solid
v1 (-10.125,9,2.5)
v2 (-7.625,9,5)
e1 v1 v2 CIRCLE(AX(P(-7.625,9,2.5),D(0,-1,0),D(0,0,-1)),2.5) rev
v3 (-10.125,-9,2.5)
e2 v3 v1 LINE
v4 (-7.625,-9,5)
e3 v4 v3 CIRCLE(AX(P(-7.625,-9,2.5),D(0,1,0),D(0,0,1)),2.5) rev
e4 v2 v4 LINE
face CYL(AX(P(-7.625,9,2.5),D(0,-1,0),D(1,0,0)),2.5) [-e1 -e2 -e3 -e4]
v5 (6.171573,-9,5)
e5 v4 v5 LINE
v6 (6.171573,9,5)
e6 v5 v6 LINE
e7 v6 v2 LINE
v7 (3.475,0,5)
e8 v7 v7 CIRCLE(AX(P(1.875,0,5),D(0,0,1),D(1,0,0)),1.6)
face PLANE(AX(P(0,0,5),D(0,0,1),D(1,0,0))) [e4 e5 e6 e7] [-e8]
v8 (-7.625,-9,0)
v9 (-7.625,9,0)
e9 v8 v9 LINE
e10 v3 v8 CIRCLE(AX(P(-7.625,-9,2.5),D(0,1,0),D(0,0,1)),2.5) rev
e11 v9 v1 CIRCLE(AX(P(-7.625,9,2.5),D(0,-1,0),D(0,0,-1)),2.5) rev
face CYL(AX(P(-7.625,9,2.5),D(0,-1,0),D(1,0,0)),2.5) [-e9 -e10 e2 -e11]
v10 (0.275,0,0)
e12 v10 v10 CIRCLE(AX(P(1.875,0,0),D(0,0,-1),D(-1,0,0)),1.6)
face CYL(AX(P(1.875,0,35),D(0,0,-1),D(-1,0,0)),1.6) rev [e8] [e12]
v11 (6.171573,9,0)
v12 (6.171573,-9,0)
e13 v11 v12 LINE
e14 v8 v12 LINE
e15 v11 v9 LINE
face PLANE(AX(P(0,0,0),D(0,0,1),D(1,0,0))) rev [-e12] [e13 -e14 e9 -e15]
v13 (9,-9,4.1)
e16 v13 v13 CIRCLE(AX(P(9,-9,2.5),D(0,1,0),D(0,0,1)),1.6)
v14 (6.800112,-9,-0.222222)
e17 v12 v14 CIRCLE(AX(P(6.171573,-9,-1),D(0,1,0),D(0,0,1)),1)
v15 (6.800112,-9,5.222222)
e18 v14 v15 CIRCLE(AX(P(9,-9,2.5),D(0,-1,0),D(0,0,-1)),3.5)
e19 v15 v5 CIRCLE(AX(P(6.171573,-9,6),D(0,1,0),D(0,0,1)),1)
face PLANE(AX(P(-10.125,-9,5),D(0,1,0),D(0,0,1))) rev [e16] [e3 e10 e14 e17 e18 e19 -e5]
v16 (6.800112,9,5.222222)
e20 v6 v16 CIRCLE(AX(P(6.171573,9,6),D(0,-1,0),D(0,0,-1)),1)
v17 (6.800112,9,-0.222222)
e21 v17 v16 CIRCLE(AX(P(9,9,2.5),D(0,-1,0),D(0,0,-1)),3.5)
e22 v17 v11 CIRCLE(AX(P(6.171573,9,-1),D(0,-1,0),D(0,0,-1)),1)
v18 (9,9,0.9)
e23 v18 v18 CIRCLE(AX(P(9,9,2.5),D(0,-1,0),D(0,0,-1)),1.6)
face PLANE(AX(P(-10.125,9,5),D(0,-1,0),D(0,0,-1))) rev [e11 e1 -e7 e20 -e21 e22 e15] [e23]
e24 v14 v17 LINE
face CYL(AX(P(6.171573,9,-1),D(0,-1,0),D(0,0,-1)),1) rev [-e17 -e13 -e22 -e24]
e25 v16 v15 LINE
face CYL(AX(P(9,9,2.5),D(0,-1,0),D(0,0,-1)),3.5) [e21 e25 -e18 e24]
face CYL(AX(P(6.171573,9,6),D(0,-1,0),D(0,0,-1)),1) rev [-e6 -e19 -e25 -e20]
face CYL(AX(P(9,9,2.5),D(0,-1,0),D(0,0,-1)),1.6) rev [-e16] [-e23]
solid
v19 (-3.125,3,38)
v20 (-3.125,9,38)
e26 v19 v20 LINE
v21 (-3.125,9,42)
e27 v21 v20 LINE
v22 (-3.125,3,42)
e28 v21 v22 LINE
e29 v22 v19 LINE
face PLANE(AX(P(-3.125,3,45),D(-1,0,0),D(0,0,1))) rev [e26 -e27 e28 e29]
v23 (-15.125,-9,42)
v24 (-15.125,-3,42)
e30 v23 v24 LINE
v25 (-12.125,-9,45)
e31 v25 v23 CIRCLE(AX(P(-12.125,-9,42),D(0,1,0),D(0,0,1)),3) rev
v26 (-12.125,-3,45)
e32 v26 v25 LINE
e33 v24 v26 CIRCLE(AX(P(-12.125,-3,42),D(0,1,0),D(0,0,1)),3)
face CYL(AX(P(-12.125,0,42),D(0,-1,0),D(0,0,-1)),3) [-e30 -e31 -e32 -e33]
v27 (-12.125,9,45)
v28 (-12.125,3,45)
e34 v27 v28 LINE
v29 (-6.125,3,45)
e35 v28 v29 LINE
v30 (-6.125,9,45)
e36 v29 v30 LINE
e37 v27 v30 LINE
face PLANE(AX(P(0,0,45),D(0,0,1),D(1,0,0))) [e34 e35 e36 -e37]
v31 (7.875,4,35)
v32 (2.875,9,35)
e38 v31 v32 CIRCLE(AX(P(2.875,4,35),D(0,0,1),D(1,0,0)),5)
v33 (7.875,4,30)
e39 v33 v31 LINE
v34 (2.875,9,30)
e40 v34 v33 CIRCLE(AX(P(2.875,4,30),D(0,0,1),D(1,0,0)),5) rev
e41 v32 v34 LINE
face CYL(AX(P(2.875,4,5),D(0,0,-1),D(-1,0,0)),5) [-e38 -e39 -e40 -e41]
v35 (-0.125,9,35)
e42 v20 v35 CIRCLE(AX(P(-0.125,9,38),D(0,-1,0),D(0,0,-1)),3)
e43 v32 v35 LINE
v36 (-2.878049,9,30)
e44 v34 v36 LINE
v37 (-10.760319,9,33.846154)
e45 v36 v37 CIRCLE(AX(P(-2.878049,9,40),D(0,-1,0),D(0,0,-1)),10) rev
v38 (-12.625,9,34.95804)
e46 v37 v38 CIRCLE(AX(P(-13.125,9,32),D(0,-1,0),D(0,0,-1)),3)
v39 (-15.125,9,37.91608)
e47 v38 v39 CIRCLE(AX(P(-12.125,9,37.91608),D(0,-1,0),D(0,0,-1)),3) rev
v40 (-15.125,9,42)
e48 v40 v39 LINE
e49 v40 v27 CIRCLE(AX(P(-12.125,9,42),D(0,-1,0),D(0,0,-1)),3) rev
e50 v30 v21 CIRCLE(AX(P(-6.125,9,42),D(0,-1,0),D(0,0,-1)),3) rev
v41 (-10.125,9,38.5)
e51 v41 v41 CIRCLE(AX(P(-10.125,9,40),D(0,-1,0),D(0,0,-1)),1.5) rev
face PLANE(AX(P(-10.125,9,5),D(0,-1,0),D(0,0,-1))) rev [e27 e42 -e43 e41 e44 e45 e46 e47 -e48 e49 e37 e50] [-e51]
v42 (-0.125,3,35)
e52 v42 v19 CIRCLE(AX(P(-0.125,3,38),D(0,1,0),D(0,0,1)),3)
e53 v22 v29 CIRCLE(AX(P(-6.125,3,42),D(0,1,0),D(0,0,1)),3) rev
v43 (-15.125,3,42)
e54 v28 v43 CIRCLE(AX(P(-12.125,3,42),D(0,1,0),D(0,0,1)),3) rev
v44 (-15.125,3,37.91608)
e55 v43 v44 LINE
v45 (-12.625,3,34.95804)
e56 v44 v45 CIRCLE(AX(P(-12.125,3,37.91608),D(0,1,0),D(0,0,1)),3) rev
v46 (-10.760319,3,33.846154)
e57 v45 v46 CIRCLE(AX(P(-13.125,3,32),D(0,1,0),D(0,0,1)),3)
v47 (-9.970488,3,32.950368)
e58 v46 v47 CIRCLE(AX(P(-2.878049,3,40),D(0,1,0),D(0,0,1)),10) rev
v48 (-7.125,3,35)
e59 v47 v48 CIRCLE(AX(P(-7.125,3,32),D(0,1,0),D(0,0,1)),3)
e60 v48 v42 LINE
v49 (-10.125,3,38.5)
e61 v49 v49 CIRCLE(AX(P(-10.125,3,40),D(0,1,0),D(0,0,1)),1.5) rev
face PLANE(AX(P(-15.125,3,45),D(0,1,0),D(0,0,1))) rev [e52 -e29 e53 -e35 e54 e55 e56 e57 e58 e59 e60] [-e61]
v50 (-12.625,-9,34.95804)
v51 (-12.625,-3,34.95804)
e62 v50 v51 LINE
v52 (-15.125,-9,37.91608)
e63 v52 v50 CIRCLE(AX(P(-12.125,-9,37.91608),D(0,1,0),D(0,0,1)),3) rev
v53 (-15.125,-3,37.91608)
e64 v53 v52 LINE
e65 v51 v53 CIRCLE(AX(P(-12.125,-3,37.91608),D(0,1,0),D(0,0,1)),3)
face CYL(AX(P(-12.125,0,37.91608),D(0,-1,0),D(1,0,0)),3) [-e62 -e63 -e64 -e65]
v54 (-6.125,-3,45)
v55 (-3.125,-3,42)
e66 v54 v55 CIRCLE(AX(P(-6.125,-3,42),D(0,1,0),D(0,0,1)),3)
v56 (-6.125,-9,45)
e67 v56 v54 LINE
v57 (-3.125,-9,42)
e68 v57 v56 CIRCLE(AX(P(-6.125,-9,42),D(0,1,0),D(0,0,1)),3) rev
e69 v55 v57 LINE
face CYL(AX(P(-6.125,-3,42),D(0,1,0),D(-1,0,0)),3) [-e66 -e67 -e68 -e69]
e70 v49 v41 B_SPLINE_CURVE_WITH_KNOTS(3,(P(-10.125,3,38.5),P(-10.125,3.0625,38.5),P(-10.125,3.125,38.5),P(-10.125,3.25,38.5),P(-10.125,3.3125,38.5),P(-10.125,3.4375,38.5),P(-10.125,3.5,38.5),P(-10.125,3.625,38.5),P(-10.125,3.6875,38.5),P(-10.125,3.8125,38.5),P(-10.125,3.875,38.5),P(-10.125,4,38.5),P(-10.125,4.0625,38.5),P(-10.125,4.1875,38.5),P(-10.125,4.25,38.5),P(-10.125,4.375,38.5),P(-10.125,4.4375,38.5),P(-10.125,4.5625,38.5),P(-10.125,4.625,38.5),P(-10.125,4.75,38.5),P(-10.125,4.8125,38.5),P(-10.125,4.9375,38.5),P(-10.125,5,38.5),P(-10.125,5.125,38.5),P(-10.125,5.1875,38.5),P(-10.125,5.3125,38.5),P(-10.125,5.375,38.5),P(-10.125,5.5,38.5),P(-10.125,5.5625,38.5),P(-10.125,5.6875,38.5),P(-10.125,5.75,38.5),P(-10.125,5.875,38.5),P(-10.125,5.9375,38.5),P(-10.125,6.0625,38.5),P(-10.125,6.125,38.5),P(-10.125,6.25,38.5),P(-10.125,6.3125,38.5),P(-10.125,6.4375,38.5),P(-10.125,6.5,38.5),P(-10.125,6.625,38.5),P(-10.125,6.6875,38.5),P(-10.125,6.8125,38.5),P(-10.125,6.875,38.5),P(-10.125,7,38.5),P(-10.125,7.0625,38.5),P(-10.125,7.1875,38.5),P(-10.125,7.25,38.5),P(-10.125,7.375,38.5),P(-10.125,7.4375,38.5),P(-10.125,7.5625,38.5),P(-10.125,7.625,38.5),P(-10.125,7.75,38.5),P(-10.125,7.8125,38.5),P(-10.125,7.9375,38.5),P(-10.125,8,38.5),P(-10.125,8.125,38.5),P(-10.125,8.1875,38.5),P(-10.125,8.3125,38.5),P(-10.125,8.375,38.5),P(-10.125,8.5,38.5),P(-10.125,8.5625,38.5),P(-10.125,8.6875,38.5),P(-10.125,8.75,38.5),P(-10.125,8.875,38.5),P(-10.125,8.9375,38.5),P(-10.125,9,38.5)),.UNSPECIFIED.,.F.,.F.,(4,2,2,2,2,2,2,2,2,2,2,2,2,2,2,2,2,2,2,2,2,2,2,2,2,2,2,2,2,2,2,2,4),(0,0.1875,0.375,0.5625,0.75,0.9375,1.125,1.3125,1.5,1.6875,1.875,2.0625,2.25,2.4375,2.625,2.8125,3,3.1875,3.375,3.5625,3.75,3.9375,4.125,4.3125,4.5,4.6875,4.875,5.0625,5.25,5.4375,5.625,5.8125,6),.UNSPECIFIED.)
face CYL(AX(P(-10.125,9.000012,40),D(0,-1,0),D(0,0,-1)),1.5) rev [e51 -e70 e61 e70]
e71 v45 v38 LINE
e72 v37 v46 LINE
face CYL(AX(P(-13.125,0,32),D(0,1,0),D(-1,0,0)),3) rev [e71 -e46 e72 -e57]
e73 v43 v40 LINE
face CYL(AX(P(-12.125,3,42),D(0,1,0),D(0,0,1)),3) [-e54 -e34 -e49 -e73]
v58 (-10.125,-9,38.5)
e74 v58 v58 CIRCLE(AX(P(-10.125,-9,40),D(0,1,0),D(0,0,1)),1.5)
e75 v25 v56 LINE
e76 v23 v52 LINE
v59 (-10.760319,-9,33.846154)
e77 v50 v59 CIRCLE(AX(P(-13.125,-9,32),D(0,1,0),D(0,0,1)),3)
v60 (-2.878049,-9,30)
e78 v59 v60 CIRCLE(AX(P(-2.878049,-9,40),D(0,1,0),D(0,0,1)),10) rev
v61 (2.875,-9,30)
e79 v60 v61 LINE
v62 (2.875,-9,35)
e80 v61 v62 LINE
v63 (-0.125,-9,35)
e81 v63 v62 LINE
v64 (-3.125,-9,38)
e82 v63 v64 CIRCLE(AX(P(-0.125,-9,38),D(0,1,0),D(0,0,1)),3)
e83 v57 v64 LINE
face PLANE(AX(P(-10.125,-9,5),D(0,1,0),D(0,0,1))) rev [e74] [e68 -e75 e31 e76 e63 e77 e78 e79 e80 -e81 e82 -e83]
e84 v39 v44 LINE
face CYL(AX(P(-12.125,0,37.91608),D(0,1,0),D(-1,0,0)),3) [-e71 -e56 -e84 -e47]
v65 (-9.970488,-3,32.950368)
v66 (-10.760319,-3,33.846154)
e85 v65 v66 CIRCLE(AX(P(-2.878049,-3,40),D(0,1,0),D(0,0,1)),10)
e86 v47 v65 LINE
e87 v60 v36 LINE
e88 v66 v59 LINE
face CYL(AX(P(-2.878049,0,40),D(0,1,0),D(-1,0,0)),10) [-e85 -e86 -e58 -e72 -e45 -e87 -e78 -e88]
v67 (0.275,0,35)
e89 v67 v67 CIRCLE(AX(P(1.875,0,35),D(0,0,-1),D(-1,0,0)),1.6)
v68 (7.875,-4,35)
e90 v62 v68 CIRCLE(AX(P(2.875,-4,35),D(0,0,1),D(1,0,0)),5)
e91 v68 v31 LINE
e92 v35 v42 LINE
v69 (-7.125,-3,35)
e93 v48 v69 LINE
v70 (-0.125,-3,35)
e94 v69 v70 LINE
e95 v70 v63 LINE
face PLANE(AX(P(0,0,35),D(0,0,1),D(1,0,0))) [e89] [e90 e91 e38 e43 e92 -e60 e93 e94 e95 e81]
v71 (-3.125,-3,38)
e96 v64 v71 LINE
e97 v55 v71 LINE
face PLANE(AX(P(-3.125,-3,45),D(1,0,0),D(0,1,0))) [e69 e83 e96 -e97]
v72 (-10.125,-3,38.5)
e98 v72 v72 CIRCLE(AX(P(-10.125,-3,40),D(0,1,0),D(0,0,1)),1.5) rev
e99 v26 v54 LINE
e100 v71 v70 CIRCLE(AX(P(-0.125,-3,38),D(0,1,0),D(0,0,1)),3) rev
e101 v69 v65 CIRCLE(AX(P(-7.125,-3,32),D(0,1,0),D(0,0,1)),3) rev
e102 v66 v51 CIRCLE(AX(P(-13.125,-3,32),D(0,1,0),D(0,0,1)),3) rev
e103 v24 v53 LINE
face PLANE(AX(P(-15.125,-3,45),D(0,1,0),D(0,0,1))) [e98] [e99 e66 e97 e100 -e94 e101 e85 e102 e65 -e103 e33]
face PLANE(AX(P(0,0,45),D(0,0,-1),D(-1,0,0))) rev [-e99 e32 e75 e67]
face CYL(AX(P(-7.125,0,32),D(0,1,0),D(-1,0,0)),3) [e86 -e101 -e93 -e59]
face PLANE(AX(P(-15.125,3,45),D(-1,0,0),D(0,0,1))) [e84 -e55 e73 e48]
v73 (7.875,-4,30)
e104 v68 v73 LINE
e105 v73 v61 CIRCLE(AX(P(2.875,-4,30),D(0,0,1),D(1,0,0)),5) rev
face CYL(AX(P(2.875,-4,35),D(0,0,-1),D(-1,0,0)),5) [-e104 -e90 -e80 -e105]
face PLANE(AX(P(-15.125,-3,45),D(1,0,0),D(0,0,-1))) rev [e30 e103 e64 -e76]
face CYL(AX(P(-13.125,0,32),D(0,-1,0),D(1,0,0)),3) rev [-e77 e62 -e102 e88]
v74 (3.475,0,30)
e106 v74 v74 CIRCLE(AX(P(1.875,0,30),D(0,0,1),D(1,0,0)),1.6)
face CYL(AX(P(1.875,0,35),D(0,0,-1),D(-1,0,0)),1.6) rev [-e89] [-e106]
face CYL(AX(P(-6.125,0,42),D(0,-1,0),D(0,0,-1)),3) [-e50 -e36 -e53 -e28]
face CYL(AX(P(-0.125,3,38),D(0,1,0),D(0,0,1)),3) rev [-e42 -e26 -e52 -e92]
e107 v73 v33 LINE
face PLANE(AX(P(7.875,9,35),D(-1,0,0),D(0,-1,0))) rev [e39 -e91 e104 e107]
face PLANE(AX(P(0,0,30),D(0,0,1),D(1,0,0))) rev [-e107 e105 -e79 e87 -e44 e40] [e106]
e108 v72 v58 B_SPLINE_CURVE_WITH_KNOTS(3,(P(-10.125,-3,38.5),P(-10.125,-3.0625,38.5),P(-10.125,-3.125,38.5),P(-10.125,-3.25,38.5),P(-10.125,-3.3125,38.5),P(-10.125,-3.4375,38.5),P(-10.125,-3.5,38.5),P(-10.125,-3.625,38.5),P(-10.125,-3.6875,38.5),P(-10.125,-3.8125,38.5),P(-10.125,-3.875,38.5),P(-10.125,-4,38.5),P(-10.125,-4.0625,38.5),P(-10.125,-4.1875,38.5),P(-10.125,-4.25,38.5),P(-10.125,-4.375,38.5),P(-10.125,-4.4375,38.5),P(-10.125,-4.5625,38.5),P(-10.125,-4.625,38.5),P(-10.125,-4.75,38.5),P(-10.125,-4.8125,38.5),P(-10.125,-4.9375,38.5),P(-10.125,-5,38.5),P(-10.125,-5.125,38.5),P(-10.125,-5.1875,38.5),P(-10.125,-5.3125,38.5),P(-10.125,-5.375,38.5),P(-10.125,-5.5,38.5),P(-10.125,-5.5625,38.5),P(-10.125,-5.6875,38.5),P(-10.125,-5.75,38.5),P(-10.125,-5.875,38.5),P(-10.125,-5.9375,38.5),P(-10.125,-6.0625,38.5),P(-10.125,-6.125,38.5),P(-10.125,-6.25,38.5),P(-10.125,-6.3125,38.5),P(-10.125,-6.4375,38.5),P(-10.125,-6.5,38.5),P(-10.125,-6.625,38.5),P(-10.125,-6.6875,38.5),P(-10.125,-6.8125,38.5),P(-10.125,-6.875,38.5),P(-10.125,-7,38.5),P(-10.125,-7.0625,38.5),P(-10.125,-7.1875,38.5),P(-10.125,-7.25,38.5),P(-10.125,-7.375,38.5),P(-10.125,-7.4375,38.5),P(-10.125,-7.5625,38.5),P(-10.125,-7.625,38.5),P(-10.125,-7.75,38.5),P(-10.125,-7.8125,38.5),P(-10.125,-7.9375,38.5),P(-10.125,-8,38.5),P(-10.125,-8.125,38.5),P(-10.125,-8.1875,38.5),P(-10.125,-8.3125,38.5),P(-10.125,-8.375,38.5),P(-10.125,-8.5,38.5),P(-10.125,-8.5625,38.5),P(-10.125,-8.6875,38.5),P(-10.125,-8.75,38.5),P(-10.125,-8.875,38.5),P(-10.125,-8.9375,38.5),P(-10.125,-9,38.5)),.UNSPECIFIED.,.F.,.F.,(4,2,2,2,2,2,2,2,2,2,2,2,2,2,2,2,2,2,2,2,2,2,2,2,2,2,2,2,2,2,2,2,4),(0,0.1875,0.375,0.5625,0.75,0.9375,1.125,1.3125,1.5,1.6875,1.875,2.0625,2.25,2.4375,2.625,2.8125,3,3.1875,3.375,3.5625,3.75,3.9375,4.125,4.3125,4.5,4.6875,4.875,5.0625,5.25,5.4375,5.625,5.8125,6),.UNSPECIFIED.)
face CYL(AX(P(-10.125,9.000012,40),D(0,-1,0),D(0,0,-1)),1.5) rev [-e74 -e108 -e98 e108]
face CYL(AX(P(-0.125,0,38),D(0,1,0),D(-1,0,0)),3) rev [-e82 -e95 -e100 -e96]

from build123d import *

# Parameters (mm, degrees)
SKETCH1_W               = 20.25
SKETCH1_H               = 18
BOSS_EXTRUDE1_DEPTH     = 5
SKETCH2_W               = 5
SKETCH2_H               = 18
BOSS_EXTRUDE2_DEPTH     = 25
SKETCH3_W               = 18
SKETCH3_H               = 18
BOSS_EXTRUDE3_DEPTH     = 5
CUT_EXTRUDE2_DEPTH      = 33.916798523
CUT_EXTRUDE2_DEPTH_BACK = 33.916798523
SKETCH5_R               = 1.6
FILLET7_R               = 5
CUT_EXTRUDE4_DEPTH      = 41.638843795
CUT_EXTRUDE4_DEPTH_BACK = 41.638843795
SKETCH10_R              = 1.6
SKETCH10_4_R            = 3.5
SKETCH10_4_R_2          = 1.6
BOSS_EXTRUDE7_DEPTH     = 18
FILLET13_R              = 1
SKETCH11_W              = 12
SKETCH11_H              = 6
BOSS_EXTRUDE8_DEPTH     = 10
CUT_EXTRUDE5_DEPTH      = 51.771701025
CUT_EXTRUDE5_DEPTH_BACK = 51.771701025
SKETCH12_R              = 1.5
FILLET17_R              = 3
FILLET18_R              = 3
FILLET19_R              = 3
SKETCH13_W              = 25
SKETCH13_H              = 18
CUT_EXTRUDE6_DEPTH      = 10
FILLET20_R              = 10
FILLET21_R              = 2.5


# Some blends are built 0.0001 mm under size
with BuildPart() as part:
    # Sketch1 → Boss-Extrude1 (new body)
    with BuildSketch(Plane.XY):
        Rectangle(SKETCH1_W, SKETCH1_H)
    extrude(amount=BOSS_EXTRUDE1_DEPTH)

    # Sketch2 → Boss-Extrude2 (add)
    with BuildSketch(Plane.XY.offset(5)):
        with Locations((-7.625, 0)):
            Rectangle(SKETCH2_W, SKETCH2_H)
    extrude(amount=BOSS_EXTRUDE2_DEPTH)

    # Sketch3 → Boss-Extrude3 (add)
    with BuildSketch(Plane.XY.offset(30)):
        with Locations((-1.125, 0)):
            Rectangle(SKETCH3_W, SKETCH3_H)
    extrude(amount=BOSS_EXTRUDE3_DEPTH)

    # Sketch5 → Cut-Extrude2 (cut, two sides: drawn at the far end of the back side and taken through both)
    with BuildSketch(Plane(origin=(0, 0, 30), x_dir=(-1, 0, 0), z_dir=(0, 0, -1)).offset(-CUT_EXTRUDE2_DEPTH_BACK)):
        with Locations((-1.875, 0)):
            Circle(SKETCH5_R)
    extrude(amount=CUT_EXTRUDE2_DEPTH + CUT_EXTRUDE2_DEPTH_BACK, mode=Mode.SUBTRACT)

    # Fillet7
    fillet7_edges = [part.edges().sort_by_distance(p)[0] for p in [
        (7.875, -9, 32.5),
        (7.875, 9, 32.5),
    ]]
    fillet(fillet7_edges, radius=FILLET7_R)

    # Sketch10 → Cut-Extrude4 (cut, two sides: drawn at the far end of the back side and taken through both)
    with BuildSketch(Plane.XZ.offset(9).offset(-CUT_EXTRUDE4_DEPTH_BACK)):
        with Locations((9, 2.5)):
            Circle(SKETCH10_R)
    extrude(amount=CUT_EXTRUDE4_DEPTH + CUT_EXTRUDE4_DEPTH_BACK, mode=Mode.SUBTRACT)

    # Sketch10<4> → Boss-Extrude7 (add)
    with BuildSketch(Plane.XZ.offset(9)):
        with Locations((9, 2.5)):
            Circle(SKETCH10_4_R)
        with Locations(Location((9, 2.5, 0), (0, 0, 270))):
            Circle(SKETCH10_4_R_2, mode=Mode.SUBTRACT)
    extrude(amount=-BOSS_EXTRUDE7_DEPTH)

    # Fillet13
    fillet13_edges = [part.edges().sort_by_distance(p)[0] for p in [
        (6.550510257, 0, 0),
        (6.550510257, 0, 5),
    ]]
    fillet(fillet13_edges, radius=FILLET13_R)

    # Sketch11 → Boss-Extrude8 (add)
    with BuildSketch(Plane.XY.offset(35)):
        with Locations((-9.125, 6)):
            Rectangle(SKETCH11_W, SKETCH11_H)
        with Locations((-9.125, -6)):
            Rectangle(SKETCH11_W, SKETCH11_H)
    extrude(amount=BOSS_EXTRUDE8_DEPTH)

    # Sketch12 → Cut-Extrude5 (cut, two sides: drawn at the far end of the back side and taken through both)
    with BuildSketch(Plane(origin=(0, 9, 0), x_dir=(1, 0, 0), z_dir=(0, 1, 0)).offset(-CUT_EXTRUDE5_DEPTH_BACK)):
        with Locations(Location((-10.125, -40, 0), (0, 0, 90))):
            Circle(SKETCH12_R)
    extrude(amount=CUT_EXTRUDE5_DEPTH + CUT_EXTRUDE5_DEPTH_BACK, mode=Mode.SUBTRACT)

    # Fillet17
    fillet17_edges = [part.edges().sort_by_distance(p)[0] for p in [
        (-10.125, -6, 35),
        (-15.125, 6, 45),
        (-3.125, 6, 35),
        (-3.125, 6, 45),
        (-3.125, -6, 35),
        (-3.125, -6, 45),
        (-15.125, -6, 45),
        (-10.125, 6, 35),
    ]]
    fillet(fillet17_edges, radius=FILLET17_R)

    # Fillet18
    fillet18_edges = [part.edges().sort_by_distance(p)[0] for p in [
        (-15.125, 6, 35),
        (-15.125, -6, 35),
    ]]
    fillet(fillet18_edges, radius=FILLET18_R)

    # Fillet19
    fillet19_edges = [part.edges().sort_by_distance(p)[0] for p in [
        (-10.125, 0, 35),
    ]]
    fillet(fillet19_edges, radius=FILLET19_R)

    # Sketch13 → Cut-Extrude6 (cut)
    with BuildSketch(Plane(origin=(-5.125, 0, 0), x_dir=(0, 0, -1), z_dir=(1, 0, 0))):
        with Locations((-17.5, 0)):
            Rectangle(SKETCH13_W, SKETCH13_H)
    extrude(amount=-CUT_EXTRUDE6_DEPTH, mode=Mode.SUBTRACT)


with BuildPart() as cut_extrude6_piece_1:
    # of the separate pieces the step leaves, piece 1, a body of its own (cut_extrude6_pieces)
    add(part.part.solids().sort_by_distance((-10.125, -9, 32))[0])

    # Fillet20
    # the kernel refuses this fillet: 10 mm, written as the material it takes off along each edge
    with BuildSketch(Plane(origin=(-10.125, 27.117376915, 30), x_dir=(-0.16297450432591723, 0, 0.9866302807737667), z_dir=(0, -1, 0))) as fillet20_piece_1:
        with BuildLine():
            CenterArc((8.685234599, -8.779806112), FILLET20_R, 118.600282976, 52.020127555)
            Line((-1.181068209, -7.150061069), (-2.16769849, -6.987086565))
            Line((-2.16769849, -6.987086565), (-0.986630281, 0.162974504))
            Line((-0.986630281, 0.162974504), (0.162974504, 0.986630281))
            ThreePointArc((0.162974504, 0.986630281), (2.136235066, 0.660681272), (3.419576463, 0.877980611))
            Line((3.419576463, 0.877980611), (3.898272657, 0))
        make_face()
    extrude(amount=54.23475383, mode=Mode.SUBTRACT)


with BuildPart() as cut_extrude6_piece_2:
    # of the separate pieces the step leaves, piece 2, a body of its own (cut_extrude6_pieces)
    add(part.part.solids().sort_by_distance((-10.125, -9, 0))[0])

    # Fillet21
    fillet21_edges = [cut_extrude6_piece_2.edges().sort_by_distance(p)[0] for p in [
        (-10.125, 0, 0),
        (-10.125, 0, 5),
    ]]
    fillet(fillet21_edges, radius=FILLET21_R - 0.0001)  # a hair under: the kernel refuses the full size


solid = Compound([cut_extrude6_piece_1.part, cut_extrude6_piece_2.part])
